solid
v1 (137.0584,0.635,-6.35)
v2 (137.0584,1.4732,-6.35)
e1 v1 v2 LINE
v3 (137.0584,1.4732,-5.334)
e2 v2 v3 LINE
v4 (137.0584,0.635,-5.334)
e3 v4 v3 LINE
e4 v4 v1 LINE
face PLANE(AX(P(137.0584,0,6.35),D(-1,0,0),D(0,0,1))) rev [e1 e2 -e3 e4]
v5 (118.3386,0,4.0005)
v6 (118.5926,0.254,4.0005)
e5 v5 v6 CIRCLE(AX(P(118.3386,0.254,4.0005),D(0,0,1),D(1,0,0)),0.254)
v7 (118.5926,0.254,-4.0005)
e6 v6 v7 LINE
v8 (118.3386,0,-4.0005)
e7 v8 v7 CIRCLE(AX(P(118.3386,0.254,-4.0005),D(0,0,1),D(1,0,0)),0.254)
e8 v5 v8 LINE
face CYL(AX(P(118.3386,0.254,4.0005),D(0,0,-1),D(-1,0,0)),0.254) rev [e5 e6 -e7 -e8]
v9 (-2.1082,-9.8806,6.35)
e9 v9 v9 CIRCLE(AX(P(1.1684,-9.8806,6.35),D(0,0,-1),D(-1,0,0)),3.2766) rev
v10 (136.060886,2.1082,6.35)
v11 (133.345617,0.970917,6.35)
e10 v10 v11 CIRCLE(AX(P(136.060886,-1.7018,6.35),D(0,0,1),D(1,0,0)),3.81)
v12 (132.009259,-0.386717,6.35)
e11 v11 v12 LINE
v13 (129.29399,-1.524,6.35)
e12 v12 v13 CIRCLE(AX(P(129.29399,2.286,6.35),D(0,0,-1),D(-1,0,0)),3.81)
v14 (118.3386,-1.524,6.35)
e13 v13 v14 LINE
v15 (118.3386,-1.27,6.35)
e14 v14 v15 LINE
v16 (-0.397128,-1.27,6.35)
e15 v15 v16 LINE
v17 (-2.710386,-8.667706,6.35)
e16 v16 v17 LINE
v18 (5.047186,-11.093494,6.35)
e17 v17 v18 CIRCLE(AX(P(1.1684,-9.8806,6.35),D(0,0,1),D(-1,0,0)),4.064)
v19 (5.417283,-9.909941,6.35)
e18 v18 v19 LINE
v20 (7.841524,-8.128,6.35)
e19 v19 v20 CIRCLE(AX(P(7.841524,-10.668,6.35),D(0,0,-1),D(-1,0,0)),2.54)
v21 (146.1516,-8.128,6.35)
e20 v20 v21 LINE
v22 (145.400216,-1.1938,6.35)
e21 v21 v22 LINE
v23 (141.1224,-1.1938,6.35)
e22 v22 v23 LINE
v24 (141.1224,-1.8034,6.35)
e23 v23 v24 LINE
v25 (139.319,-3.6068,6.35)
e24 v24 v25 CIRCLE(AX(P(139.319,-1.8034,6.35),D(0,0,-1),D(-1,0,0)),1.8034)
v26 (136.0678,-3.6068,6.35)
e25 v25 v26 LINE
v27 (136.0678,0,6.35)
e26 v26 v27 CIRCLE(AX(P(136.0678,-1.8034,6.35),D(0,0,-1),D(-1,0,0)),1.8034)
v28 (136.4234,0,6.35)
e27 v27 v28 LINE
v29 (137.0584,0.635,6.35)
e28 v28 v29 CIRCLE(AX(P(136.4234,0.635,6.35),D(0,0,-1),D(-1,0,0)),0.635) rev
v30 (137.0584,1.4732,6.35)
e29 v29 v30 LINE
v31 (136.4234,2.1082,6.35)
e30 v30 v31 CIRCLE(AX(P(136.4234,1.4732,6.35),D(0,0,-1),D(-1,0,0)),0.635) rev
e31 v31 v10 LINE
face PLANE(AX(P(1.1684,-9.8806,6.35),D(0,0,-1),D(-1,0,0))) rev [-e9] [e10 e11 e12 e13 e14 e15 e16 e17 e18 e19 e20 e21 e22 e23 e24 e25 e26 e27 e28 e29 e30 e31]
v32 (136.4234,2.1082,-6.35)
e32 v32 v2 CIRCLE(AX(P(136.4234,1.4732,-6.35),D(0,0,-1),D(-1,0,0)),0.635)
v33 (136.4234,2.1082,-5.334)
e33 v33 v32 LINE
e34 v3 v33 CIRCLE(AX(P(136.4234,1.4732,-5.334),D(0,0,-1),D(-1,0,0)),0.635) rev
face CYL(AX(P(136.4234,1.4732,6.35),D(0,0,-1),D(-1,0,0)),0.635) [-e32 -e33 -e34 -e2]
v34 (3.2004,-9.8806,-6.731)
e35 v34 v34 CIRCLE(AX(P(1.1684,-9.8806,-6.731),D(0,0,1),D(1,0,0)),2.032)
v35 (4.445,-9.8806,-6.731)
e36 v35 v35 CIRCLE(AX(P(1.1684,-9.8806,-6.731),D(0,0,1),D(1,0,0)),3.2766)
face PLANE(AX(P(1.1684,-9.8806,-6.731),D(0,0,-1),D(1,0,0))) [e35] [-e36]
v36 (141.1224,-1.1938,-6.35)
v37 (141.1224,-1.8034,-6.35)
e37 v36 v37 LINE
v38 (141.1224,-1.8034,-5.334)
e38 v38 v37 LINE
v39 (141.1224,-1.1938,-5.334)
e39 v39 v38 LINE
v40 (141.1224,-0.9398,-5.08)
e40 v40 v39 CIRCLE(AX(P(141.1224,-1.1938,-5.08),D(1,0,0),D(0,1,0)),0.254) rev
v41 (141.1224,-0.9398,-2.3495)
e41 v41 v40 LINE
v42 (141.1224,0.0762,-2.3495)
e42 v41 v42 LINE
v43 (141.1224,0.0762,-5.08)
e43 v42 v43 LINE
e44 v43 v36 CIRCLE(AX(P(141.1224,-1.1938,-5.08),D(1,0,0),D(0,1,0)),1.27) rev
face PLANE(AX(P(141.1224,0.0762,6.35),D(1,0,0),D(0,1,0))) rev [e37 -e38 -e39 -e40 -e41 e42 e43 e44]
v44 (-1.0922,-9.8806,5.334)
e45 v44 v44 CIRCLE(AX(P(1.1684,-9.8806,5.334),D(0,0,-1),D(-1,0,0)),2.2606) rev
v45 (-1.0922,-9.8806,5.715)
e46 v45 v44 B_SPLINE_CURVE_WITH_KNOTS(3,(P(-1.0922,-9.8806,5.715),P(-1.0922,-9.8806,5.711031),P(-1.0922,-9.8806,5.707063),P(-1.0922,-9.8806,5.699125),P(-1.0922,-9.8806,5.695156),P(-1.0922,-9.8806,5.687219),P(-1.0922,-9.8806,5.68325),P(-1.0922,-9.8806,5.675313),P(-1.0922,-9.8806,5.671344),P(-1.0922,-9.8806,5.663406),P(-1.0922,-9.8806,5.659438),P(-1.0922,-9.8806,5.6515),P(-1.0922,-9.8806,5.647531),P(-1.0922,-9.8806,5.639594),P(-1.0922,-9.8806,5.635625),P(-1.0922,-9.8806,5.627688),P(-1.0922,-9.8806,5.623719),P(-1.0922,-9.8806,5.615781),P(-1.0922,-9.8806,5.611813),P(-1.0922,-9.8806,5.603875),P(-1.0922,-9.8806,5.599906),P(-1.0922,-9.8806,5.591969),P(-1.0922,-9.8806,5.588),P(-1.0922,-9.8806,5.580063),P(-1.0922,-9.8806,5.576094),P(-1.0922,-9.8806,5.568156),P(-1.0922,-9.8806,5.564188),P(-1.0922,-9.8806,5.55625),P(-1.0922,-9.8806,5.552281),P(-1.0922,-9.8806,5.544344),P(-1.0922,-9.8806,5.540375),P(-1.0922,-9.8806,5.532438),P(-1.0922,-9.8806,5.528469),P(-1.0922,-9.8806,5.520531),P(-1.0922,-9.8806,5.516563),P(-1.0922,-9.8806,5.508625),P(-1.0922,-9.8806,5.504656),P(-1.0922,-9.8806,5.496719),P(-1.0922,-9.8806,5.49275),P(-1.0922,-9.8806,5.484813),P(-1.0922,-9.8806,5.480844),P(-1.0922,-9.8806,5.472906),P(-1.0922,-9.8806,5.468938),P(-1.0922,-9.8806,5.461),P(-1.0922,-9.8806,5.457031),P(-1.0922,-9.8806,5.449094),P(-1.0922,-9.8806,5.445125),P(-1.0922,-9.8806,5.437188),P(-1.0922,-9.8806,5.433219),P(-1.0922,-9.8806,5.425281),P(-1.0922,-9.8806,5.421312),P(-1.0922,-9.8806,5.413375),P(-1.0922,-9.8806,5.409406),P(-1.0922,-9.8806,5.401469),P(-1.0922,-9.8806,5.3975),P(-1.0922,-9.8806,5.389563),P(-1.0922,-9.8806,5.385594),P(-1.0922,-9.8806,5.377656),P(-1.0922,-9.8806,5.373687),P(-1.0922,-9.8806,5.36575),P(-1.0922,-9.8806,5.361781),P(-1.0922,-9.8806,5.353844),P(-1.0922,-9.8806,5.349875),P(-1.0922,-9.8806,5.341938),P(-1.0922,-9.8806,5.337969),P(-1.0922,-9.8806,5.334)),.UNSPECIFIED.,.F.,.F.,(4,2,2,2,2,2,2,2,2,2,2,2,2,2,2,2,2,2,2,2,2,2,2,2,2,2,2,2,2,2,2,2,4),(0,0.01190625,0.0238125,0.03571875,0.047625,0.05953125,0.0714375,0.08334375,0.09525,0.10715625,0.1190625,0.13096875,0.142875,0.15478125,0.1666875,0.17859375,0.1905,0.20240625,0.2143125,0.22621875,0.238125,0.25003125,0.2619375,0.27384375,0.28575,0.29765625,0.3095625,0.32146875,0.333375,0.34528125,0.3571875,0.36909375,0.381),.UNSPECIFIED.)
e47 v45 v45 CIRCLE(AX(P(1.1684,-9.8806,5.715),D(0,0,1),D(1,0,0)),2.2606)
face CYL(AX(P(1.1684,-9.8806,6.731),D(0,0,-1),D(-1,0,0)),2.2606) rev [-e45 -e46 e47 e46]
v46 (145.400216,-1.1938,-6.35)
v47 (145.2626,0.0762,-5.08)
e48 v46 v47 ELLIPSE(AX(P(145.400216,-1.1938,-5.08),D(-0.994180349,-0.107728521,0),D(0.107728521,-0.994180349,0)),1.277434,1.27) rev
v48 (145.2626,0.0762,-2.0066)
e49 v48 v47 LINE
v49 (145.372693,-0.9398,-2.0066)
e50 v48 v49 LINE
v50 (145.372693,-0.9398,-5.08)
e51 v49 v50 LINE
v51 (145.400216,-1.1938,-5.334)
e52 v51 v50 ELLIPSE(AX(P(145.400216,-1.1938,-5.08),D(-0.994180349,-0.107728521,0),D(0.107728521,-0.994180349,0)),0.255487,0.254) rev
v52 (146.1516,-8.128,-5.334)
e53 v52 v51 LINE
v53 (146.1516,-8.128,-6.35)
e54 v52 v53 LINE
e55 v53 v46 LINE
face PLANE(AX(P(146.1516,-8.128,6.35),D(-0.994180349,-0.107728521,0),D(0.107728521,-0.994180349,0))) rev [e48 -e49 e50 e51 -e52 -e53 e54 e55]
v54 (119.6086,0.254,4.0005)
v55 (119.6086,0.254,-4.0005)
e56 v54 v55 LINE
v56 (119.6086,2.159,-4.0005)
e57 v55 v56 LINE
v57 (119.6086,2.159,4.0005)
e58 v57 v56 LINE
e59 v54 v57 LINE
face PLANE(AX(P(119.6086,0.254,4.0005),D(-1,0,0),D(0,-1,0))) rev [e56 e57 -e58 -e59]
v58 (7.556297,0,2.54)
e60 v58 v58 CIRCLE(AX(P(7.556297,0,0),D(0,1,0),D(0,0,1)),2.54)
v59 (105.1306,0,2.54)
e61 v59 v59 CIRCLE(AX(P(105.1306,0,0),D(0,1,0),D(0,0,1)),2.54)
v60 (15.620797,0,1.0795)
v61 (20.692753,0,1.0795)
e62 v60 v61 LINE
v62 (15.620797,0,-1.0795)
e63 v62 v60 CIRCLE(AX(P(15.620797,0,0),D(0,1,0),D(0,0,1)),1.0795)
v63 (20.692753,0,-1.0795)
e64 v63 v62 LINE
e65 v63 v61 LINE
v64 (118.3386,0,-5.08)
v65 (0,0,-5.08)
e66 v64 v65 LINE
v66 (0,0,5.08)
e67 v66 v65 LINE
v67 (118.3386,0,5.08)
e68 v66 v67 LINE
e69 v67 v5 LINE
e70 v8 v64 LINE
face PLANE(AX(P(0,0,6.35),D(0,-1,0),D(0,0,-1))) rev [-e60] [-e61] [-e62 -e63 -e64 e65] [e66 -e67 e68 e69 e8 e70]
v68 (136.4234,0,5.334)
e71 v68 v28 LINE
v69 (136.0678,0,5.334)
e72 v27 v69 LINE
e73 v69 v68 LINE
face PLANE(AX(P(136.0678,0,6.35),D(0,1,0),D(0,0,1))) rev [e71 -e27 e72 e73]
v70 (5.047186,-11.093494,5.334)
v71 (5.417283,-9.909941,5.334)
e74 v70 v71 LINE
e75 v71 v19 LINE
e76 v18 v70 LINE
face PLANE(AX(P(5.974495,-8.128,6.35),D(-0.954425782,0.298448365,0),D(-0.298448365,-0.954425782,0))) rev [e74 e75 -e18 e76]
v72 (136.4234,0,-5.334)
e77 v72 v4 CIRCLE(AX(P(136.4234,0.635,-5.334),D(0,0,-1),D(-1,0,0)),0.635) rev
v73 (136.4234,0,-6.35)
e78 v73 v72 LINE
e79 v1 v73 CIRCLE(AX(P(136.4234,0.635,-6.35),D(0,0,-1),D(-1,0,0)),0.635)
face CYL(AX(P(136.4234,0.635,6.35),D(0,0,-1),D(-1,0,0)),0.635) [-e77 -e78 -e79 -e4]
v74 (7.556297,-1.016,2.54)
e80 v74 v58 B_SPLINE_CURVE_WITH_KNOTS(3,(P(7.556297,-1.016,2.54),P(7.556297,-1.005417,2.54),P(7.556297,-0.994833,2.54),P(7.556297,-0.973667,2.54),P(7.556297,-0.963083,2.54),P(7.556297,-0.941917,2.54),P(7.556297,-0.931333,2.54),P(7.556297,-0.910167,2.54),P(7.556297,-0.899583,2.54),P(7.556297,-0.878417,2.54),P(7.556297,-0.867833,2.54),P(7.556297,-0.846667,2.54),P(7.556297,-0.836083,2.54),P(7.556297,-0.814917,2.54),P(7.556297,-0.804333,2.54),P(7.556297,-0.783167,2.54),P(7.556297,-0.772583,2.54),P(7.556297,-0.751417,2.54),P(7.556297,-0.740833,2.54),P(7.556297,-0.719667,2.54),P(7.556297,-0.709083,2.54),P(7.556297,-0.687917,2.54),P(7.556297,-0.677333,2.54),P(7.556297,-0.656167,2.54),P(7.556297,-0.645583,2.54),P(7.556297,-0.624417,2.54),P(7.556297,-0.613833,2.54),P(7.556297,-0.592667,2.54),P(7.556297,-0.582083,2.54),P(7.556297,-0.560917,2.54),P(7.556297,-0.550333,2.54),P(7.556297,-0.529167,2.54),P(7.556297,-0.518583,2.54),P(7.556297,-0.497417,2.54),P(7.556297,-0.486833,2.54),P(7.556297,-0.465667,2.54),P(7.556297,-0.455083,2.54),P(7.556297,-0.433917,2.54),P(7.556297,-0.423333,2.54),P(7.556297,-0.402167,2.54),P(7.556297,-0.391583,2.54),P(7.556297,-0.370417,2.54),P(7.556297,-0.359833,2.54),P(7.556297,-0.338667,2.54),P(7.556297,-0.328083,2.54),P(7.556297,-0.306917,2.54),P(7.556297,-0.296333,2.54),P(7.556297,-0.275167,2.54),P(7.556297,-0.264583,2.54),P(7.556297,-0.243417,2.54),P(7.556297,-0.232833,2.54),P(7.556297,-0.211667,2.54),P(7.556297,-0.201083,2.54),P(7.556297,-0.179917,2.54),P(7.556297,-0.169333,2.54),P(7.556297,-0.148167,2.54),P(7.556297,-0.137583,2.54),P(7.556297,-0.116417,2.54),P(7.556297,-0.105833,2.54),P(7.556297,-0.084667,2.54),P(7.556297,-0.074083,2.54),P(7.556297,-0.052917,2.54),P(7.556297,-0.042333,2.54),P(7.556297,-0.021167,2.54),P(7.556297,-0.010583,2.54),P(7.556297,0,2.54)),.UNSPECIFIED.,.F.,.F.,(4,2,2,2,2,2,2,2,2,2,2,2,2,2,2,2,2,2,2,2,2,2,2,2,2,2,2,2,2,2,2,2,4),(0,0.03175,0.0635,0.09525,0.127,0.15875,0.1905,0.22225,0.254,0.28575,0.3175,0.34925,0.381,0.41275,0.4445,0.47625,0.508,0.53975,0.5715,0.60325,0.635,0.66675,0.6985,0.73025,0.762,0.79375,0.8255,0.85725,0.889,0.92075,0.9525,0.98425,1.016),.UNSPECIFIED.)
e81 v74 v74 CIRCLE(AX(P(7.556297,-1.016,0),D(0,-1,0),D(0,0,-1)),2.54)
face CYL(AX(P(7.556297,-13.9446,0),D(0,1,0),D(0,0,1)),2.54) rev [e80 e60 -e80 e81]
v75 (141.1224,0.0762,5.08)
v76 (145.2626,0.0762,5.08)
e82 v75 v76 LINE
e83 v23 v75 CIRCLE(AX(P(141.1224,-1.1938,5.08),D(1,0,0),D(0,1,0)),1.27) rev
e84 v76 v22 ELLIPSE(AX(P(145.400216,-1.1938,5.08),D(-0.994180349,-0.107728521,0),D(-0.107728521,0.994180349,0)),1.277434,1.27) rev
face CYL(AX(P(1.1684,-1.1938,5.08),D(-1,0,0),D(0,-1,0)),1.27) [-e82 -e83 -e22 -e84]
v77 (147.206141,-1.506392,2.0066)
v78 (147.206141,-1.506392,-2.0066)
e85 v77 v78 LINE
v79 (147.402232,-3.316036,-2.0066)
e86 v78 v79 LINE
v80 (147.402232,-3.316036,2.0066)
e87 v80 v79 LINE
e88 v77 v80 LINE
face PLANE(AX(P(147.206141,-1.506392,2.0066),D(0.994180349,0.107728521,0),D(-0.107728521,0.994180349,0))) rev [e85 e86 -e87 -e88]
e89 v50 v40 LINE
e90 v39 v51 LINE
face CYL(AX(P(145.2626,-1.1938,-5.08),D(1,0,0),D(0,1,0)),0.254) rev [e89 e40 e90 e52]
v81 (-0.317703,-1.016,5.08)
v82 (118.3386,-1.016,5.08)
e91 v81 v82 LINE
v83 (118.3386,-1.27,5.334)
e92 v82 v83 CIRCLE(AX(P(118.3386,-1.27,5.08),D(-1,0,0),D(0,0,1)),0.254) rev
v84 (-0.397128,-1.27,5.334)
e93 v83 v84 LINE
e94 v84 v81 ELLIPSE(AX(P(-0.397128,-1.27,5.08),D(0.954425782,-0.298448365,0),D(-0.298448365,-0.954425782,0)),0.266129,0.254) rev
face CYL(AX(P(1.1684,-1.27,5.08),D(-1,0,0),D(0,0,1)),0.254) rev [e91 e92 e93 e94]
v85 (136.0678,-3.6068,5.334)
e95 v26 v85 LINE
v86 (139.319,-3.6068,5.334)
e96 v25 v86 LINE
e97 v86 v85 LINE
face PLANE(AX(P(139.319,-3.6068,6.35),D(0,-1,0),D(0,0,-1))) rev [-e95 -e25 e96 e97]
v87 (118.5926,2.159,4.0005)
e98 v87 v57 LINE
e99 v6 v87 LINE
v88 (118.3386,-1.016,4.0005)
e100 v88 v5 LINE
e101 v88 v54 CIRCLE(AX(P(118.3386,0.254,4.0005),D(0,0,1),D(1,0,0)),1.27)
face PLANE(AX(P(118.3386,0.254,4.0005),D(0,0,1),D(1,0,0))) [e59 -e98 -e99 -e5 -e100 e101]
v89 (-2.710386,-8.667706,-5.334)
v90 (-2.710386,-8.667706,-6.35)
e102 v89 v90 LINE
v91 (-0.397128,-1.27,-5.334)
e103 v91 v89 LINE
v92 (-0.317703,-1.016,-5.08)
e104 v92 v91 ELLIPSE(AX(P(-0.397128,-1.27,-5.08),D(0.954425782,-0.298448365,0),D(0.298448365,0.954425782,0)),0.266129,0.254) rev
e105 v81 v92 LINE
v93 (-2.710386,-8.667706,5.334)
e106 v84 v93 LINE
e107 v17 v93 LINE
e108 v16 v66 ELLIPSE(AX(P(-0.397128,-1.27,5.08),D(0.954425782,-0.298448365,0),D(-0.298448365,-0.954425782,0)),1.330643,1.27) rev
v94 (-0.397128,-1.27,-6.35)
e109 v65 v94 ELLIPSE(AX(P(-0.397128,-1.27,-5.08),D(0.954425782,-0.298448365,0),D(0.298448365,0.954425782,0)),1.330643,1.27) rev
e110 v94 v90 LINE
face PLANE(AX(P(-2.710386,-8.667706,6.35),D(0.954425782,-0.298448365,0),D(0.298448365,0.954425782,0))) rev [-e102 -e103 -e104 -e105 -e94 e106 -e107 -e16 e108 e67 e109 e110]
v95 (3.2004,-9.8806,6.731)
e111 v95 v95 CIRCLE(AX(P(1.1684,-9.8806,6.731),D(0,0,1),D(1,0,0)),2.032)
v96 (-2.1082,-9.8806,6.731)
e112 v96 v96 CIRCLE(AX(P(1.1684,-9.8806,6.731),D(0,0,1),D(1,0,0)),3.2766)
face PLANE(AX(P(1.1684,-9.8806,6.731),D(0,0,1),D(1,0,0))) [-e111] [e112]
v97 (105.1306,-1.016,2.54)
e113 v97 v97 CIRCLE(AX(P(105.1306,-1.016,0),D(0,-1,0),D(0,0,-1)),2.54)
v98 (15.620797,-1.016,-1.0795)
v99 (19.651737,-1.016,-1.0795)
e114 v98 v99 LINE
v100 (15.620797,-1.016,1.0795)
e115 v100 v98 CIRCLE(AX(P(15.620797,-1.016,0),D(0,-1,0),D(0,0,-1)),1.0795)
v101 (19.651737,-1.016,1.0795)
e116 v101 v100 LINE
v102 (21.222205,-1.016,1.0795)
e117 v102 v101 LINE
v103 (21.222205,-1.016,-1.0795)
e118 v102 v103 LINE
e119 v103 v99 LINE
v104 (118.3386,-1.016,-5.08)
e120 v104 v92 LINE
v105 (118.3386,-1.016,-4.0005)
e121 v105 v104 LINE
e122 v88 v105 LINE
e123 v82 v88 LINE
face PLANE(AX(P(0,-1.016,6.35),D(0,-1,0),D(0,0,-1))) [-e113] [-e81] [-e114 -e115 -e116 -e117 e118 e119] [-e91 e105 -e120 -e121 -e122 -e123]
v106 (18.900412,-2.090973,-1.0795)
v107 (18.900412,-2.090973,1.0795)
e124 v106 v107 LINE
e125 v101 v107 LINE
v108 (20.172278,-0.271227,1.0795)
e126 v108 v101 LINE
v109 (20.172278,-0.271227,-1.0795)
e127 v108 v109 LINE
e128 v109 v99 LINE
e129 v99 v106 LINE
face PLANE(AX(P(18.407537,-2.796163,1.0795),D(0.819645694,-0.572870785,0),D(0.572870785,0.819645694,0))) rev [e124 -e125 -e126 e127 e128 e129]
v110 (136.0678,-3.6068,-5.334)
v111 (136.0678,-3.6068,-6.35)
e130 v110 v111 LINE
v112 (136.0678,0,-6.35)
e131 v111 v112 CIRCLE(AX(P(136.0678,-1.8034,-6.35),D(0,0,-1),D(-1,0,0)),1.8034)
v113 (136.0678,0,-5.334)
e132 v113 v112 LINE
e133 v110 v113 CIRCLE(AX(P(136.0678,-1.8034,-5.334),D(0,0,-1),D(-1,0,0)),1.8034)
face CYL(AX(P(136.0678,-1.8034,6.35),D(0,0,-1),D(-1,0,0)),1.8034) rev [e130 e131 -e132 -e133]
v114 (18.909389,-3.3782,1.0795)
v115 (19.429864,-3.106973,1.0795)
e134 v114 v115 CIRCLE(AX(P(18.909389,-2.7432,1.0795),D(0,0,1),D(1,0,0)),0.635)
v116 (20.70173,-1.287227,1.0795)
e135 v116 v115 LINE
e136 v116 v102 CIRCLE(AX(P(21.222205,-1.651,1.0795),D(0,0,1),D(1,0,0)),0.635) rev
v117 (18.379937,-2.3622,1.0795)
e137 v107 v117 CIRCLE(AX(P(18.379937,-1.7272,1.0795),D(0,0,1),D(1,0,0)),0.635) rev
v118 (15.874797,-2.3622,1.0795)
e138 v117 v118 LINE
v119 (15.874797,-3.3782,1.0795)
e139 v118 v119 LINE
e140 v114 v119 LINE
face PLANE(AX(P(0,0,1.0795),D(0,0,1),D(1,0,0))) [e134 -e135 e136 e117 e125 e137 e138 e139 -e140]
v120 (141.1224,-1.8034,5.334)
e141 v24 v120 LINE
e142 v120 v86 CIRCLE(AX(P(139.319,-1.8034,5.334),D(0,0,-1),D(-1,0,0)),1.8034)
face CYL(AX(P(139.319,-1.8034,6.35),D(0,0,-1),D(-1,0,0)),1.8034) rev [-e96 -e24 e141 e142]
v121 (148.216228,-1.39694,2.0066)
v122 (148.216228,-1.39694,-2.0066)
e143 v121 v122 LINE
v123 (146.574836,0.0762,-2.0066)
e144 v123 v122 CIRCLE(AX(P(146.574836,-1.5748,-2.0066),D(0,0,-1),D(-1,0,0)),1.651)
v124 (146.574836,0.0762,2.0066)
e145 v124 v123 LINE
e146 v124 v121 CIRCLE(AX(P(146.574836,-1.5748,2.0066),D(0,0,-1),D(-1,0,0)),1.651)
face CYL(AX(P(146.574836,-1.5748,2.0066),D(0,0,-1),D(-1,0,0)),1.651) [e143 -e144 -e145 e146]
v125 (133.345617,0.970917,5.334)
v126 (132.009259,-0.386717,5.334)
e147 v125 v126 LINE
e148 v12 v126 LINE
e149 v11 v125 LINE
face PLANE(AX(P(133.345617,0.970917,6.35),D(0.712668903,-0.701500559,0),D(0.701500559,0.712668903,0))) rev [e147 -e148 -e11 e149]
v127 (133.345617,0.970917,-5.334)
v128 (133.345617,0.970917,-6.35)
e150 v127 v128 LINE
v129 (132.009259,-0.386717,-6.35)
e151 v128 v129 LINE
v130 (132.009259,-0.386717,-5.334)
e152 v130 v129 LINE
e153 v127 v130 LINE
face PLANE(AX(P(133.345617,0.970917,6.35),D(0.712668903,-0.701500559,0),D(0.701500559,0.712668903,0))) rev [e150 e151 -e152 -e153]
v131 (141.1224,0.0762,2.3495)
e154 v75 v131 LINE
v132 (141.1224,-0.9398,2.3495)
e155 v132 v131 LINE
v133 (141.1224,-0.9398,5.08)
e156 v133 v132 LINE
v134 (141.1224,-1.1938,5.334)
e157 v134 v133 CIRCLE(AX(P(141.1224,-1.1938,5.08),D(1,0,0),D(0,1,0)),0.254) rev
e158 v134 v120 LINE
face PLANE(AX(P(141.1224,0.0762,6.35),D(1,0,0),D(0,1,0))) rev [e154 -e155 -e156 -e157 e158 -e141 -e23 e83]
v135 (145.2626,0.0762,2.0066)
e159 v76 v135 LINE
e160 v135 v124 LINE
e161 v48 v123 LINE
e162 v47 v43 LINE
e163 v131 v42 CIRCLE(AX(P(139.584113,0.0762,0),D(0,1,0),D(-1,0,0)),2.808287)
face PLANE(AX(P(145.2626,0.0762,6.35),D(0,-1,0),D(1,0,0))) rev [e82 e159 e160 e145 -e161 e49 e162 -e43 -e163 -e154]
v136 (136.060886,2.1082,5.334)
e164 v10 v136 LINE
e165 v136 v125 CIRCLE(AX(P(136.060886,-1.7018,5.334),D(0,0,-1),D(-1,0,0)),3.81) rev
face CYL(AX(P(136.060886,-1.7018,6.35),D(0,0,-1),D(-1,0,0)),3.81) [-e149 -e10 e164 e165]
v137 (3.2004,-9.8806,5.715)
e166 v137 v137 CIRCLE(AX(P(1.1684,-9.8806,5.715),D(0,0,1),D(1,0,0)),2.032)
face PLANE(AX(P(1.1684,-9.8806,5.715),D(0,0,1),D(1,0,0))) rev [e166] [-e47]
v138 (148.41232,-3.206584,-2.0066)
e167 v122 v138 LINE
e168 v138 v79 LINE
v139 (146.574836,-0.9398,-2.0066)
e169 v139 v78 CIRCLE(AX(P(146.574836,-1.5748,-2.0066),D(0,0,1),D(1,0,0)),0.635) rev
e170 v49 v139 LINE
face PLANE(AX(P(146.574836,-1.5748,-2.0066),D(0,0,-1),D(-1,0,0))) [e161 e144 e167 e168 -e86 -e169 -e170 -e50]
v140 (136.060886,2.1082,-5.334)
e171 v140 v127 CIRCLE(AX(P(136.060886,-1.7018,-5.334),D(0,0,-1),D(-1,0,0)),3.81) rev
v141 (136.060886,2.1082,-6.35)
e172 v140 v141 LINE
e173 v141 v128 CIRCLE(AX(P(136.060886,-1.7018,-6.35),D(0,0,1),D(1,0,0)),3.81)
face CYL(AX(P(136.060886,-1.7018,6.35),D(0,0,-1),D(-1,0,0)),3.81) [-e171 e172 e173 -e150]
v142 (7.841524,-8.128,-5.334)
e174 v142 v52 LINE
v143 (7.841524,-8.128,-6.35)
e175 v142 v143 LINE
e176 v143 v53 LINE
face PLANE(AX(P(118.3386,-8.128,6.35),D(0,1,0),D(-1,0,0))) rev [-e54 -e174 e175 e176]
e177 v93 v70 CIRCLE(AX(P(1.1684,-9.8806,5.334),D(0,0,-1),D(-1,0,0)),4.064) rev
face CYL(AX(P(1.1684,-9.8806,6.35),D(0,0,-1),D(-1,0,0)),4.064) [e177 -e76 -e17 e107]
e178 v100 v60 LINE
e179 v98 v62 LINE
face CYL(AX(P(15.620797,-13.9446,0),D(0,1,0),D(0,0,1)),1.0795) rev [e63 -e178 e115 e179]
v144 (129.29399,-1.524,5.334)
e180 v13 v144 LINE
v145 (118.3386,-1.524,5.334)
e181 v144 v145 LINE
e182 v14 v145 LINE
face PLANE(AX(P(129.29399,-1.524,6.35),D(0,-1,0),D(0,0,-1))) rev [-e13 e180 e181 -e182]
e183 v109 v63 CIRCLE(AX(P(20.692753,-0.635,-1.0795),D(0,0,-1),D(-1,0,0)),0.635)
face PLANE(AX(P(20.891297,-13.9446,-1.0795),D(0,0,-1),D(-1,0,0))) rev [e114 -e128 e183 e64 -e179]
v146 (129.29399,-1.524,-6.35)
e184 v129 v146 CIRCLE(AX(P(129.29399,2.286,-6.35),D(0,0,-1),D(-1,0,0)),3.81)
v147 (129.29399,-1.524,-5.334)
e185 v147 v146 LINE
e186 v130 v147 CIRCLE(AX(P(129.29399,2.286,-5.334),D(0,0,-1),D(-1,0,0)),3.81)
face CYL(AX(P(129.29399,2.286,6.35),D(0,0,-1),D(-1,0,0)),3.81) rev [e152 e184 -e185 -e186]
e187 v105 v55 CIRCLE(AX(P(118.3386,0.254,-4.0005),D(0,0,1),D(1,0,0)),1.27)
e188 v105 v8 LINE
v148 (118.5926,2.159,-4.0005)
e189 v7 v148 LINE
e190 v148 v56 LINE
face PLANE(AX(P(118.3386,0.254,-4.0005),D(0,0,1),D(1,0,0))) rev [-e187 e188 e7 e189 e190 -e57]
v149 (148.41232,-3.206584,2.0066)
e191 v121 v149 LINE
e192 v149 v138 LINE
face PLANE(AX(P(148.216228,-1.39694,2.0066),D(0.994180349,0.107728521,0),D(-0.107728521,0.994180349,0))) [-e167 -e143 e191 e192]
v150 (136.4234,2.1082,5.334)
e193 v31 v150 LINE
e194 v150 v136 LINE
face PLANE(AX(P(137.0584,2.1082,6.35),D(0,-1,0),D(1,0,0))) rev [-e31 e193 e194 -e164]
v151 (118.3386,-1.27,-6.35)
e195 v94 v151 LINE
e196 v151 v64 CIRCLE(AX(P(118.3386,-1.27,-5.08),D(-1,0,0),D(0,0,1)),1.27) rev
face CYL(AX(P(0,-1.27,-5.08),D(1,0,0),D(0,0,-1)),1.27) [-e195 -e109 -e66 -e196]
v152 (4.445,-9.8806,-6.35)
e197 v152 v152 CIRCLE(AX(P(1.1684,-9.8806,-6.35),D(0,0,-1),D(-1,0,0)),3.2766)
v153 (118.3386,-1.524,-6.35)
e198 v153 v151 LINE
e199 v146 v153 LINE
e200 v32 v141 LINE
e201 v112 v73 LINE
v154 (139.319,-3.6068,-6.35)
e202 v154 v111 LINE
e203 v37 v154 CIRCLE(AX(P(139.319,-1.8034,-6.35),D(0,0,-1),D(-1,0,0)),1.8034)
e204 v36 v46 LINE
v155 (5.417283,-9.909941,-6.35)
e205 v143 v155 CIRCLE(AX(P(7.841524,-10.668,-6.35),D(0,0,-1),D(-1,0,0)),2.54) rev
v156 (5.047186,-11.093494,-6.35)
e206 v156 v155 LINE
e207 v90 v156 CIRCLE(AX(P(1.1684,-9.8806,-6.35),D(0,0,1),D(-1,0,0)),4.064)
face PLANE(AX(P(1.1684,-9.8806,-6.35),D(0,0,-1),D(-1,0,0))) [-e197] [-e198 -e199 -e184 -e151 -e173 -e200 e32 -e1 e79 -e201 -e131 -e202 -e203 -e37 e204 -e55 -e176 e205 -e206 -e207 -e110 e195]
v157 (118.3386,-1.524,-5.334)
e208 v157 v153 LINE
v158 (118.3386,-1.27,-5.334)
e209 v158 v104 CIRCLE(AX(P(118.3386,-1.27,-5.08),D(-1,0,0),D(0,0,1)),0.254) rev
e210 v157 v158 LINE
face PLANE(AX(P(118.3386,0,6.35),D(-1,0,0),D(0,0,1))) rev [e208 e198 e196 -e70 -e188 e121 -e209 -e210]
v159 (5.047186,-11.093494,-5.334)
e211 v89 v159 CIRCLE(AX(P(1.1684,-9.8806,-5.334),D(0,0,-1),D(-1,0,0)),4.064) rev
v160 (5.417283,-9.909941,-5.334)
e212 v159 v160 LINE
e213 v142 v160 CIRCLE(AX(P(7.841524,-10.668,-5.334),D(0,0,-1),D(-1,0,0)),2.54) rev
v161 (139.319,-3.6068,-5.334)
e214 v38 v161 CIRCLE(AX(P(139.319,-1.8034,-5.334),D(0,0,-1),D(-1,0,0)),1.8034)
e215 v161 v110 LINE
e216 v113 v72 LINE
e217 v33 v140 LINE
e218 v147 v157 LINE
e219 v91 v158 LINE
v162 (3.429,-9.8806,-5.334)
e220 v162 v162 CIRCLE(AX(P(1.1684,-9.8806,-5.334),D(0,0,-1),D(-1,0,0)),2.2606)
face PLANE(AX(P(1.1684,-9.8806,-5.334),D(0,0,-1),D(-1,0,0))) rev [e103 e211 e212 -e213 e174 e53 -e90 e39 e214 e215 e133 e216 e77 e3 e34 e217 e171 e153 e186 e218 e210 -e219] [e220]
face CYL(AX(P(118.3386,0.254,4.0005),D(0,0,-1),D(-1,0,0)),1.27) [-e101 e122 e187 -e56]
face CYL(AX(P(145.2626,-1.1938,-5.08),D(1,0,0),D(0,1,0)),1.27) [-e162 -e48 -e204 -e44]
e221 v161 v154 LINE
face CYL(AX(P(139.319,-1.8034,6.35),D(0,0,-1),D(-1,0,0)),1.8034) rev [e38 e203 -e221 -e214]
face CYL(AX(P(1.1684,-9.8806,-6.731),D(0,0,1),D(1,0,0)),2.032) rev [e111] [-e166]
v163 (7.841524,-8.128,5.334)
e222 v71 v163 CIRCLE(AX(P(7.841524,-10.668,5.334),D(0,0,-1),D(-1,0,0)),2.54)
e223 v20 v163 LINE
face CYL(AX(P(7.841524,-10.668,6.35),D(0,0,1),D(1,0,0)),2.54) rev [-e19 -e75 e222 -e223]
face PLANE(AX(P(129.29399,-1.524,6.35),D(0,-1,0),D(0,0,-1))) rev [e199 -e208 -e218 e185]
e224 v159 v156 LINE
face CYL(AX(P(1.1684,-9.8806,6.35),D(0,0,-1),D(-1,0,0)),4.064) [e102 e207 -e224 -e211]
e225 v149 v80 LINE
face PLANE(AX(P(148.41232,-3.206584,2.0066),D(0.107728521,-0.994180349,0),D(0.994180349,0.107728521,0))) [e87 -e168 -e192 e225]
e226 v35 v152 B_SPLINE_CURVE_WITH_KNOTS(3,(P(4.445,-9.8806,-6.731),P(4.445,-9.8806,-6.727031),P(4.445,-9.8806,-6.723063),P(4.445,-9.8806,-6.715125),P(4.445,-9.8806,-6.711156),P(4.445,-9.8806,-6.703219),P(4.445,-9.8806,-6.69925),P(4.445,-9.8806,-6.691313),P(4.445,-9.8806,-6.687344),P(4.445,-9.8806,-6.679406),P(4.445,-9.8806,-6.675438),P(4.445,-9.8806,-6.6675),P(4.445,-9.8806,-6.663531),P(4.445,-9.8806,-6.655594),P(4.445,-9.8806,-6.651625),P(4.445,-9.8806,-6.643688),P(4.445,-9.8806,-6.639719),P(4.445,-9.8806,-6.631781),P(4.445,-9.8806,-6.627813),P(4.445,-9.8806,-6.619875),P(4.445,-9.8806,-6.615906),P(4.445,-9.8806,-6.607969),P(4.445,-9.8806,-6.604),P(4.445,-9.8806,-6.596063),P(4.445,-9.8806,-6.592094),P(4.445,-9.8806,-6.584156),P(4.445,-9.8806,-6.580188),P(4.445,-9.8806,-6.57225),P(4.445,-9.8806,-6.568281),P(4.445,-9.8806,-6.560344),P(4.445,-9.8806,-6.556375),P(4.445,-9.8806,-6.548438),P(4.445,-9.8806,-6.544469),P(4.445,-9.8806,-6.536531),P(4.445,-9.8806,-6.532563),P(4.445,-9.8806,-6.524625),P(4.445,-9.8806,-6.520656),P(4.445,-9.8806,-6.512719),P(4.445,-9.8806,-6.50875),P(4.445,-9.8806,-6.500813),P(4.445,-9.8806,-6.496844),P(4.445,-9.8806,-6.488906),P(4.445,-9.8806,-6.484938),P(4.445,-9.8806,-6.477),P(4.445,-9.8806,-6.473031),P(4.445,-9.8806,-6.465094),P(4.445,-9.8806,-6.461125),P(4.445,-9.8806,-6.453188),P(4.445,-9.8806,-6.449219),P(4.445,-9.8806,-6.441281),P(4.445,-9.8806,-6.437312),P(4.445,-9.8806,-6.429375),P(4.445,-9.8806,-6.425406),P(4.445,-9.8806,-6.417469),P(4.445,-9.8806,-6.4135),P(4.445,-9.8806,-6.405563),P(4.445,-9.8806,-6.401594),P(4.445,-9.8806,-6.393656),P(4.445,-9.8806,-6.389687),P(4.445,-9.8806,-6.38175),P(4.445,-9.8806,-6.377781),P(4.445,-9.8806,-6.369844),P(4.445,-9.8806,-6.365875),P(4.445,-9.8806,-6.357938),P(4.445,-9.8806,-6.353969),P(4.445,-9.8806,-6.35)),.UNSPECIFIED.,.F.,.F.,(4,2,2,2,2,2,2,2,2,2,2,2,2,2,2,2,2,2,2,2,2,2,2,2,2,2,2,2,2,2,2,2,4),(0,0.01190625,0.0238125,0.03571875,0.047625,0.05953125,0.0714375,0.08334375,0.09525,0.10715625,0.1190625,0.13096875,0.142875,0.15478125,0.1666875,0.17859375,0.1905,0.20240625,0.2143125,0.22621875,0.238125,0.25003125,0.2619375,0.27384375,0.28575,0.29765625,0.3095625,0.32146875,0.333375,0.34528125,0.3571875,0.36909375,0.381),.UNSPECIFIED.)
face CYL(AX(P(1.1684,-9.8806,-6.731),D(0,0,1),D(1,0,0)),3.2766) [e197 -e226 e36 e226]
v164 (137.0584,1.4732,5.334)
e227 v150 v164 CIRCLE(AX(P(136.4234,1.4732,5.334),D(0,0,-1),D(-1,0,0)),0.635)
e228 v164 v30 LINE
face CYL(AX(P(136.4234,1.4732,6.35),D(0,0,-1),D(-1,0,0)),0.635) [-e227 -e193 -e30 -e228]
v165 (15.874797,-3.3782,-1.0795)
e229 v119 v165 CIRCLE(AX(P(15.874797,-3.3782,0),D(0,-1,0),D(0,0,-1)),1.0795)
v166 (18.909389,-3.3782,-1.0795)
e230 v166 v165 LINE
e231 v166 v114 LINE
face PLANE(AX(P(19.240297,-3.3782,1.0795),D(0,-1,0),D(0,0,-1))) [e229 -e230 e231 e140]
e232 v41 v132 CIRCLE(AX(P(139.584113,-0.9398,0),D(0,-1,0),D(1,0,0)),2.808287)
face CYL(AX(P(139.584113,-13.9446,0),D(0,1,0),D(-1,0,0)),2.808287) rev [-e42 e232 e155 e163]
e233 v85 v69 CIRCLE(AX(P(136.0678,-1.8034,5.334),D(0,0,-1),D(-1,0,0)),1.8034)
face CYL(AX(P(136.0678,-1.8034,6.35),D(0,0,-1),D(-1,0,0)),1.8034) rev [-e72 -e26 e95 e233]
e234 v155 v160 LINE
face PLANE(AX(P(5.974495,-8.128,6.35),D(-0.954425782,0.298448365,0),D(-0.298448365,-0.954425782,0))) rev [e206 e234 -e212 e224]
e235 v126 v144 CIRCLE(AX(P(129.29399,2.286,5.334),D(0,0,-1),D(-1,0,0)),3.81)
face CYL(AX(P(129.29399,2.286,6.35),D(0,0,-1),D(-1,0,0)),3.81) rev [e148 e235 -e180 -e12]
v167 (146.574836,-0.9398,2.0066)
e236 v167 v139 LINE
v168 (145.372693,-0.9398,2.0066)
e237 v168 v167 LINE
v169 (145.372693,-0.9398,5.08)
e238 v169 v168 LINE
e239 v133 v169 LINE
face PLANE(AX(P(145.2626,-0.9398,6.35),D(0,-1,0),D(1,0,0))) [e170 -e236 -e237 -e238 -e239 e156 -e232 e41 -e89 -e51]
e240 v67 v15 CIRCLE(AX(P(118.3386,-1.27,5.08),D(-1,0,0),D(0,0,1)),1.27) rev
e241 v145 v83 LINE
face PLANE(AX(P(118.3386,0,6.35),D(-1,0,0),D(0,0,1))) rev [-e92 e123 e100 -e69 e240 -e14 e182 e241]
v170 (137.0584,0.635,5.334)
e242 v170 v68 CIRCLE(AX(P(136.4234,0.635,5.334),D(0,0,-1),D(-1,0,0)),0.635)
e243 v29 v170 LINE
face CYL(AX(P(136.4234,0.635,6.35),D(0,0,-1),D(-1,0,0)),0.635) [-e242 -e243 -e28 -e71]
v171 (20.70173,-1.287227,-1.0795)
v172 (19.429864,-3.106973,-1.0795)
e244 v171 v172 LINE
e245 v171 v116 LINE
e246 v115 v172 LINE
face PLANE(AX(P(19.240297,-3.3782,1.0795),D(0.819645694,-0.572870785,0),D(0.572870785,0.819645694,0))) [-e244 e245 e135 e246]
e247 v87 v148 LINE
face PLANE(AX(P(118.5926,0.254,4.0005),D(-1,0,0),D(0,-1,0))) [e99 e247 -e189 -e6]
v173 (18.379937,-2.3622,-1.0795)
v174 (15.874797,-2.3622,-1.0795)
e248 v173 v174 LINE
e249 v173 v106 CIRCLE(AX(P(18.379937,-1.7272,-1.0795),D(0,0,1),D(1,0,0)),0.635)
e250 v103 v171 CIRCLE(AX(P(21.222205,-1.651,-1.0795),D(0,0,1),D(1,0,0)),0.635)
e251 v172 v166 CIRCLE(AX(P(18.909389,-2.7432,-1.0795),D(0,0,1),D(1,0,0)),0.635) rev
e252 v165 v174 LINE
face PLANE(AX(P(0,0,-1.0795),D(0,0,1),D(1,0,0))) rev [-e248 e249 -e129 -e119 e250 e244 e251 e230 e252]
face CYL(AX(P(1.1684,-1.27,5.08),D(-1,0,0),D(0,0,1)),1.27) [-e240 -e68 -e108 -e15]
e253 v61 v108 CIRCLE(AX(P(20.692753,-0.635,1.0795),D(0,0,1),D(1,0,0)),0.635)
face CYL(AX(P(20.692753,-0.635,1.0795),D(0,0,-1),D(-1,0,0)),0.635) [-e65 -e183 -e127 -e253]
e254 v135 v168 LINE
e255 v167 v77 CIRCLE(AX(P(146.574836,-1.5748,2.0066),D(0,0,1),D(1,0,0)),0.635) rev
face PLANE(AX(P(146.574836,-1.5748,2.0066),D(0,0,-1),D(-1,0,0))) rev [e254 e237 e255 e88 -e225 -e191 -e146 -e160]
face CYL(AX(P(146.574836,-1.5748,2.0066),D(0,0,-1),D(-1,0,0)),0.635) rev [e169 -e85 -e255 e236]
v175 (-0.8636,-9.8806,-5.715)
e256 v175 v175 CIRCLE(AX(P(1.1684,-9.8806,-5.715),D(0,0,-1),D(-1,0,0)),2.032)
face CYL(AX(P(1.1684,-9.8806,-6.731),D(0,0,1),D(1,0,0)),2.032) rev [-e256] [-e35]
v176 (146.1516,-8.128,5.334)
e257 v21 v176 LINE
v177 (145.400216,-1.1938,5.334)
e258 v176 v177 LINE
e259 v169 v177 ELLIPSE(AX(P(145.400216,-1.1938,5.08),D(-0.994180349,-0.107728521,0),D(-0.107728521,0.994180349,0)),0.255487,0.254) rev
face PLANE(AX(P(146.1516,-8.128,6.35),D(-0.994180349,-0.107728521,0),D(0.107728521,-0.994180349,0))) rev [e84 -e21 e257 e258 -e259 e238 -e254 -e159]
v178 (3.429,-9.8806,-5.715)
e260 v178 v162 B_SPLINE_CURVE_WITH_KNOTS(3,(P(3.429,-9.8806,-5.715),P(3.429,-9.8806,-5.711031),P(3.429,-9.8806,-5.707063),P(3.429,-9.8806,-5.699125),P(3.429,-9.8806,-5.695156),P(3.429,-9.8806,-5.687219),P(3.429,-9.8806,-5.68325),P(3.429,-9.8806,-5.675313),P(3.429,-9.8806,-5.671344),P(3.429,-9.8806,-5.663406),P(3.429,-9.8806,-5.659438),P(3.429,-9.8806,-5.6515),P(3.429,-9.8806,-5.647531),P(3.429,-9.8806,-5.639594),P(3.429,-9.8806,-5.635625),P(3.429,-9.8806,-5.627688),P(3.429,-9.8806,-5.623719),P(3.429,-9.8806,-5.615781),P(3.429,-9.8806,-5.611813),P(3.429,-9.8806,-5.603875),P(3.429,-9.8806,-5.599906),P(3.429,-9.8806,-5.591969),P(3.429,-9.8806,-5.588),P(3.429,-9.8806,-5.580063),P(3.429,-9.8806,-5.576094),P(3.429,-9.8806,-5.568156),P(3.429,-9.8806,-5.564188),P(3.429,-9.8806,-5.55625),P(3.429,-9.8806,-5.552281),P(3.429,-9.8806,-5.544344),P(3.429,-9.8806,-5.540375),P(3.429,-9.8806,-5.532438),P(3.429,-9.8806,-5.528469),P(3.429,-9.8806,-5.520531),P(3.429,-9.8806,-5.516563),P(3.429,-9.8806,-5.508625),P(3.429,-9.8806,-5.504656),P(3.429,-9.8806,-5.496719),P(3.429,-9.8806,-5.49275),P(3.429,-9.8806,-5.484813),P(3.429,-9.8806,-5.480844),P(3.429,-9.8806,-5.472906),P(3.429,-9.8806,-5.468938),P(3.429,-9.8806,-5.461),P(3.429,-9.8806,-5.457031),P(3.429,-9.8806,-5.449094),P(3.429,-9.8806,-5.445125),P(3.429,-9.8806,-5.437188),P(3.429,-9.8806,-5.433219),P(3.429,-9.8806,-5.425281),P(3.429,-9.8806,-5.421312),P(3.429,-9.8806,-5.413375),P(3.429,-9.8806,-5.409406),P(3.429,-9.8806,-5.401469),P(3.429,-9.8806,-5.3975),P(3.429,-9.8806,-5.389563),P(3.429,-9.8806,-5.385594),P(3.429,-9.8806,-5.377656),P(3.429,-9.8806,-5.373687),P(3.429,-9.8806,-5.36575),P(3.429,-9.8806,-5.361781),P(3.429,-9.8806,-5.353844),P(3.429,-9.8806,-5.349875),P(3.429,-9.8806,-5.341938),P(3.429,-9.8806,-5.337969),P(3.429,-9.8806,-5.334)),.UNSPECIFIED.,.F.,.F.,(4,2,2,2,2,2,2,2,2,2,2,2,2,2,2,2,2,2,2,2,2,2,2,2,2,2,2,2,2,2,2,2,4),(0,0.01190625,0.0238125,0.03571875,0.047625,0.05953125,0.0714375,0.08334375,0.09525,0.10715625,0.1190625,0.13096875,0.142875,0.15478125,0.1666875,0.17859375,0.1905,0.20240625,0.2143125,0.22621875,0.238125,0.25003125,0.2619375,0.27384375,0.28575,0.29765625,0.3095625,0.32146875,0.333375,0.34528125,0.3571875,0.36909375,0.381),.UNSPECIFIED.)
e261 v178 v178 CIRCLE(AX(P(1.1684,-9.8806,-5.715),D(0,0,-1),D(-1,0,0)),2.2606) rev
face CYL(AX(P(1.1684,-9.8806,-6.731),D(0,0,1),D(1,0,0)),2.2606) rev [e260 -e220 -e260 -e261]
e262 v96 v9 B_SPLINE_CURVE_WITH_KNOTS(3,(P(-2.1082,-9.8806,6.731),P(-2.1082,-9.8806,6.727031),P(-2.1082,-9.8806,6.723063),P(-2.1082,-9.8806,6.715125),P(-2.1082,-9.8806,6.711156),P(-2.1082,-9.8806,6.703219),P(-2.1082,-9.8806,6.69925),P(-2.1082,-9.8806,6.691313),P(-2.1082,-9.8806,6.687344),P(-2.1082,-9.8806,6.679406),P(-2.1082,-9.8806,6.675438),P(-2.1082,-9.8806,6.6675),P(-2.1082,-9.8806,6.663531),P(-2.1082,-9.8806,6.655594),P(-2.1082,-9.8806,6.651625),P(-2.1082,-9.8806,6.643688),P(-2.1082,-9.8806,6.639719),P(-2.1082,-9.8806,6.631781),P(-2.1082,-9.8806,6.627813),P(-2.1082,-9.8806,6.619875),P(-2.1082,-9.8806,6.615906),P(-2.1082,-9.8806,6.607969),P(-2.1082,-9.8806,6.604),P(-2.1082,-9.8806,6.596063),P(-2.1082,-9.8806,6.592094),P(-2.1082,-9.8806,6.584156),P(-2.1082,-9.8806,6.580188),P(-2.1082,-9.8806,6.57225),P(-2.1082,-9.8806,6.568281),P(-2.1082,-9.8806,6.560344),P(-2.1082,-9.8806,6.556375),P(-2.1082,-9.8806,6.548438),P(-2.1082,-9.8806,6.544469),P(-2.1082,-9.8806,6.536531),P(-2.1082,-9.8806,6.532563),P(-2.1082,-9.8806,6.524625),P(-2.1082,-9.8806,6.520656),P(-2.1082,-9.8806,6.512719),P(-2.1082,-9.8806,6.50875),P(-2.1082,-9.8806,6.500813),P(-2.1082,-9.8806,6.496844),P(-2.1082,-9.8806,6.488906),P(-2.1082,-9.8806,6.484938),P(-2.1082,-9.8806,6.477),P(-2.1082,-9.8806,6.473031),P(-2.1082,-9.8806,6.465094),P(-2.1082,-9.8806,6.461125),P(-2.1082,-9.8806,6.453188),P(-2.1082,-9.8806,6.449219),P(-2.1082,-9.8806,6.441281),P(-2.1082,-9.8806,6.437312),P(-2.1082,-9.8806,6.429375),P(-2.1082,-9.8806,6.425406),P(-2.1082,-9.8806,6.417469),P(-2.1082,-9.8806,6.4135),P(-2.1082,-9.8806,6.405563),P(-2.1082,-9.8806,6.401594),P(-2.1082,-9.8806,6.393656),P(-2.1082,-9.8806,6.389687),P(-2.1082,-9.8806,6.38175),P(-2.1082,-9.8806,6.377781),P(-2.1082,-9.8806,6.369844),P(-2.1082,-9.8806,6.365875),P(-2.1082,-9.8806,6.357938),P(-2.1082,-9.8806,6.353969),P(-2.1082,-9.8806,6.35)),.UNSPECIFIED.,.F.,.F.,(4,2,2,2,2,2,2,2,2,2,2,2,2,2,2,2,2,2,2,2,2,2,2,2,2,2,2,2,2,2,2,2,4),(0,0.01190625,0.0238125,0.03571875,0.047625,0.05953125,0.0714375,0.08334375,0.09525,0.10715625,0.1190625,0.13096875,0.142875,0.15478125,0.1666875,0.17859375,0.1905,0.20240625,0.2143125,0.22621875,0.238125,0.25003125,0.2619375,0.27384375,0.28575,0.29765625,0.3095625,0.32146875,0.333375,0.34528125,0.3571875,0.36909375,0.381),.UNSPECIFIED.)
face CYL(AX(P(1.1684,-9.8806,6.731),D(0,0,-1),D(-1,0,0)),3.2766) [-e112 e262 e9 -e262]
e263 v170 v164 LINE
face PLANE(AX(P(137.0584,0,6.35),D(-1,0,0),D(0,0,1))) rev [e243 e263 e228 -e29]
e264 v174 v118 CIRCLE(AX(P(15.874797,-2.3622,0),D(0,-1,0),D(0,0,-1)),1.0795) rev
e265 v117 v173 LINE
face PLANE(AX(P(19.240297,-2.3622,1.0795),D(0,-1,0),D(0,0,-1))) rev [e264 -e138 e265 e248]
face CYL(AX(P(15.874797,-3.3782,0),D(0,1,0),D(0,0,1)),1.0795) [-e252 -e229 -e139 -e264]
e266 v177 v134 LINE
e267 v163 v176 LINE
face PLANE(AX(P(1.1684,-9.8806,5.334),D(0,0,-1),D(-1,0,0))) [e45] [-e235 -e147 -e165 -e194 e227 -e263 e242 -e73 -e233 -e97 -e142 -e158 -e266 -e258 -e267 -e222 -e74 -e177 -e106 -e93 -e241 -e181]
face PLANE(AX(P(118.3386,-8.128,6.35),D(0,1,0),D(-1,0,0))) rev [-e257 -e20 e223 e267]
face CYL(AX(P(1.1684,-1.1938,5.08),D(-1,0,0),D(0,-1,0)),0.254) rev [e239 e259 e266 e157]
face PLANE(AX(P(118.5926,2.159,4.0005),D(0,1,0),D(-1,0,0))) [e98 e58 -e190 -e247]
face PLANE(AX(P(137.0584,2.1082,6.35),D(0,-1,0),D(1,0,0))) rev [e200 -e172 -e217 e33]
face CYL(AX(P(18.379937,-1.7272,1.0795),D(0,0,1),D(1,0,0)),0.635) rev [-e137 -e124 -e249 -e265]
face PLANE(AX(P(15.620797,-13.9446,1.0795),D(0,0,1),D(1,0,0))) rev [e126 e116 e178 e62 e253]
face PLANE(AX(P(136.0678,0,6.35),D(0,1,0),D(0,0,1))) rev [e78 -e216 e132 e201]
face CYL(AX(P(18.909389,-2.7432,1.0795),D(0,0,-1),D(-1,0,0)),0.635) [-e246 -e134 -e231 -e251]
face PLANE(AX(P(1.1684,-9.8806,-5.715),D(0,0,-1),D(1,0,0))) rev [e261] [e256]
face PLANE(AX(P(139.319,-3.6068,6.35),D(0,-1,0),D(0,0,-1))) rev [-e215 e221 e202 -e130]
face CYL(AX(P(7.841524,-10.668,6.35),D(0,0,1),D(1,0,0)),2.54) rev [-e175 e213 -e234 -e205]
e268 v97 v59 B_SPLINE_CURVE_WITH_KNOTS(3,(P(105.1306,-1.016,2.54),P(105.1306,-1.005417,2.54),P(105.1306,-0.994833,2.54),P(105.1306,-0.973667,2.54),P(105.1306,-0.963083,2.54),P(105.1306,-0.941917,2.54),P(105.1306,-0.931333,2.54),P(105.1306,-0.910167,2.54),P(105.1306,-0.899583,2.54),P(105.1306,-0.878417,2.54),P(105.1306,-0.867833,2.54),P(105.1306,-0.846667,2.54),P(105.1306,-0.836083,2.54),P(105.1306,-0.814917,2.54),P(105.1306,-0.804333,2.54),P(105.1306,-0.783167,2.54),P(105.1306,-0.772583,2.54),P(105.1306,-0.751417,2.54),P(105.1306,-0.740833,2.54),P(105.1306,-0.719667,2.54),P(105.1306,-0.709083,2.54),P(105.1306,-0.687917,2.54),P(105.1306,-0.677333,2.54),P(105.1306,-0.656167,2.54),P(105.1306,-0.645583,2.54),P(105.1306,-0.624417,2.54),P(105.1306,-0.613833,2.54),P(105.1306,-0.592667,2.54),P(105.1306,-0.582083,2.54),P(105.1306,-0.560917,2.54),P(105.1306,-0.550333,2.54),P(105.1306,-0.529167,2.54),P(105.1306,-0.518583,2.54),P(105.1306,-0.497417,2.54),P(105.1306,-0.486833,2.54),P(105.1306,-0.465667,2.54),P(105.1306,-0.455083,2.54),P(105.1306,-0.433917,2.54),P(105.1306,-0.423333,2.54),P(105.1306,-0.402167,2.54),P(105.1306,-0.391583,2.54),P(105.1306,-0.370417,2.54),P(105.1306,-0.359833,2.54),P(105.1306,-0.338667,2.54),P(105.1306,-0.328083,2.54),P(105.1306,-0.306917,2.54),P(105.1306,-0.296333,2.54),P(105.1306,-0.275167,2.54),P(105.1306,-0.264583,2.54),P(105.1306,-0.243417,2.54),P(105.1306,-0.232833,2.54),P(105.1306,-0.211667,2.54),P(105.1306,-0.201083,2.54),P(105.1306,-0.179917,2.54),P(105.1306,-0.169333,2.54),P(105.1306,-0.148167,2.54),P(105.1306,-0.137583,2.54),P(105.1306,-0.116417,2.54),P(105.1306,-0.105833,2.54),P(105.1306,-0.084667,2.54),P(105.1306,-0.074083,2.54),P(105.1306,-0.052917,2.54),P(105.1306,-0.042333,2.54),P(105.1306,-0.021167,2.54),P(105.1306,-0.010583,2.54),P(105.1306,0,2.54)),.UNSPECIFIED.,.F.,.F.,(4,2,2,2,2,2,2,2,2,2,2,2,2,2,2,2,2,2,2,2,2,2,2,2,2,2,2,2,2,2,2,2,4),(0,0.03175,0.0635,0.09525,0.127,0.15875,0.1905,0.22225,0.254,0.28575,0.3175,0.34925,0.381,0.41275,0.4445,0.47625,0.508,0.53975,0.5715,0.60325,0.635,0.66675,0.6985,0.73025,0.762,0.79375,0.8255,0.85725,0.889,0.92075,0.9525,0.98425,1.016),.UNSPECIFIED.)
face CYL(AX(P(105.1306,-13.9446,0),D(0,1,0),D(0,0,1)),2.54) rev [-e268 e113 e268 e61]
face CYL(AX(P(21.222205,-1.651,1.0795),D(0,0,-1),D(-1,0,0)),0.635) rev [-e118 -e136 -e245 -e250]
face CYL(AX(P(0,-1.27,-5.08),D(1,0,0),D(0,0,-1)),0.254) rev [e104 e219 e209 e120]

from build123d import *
from OCP.BRepFilletAPI import BRepFilletAPI_MakeFillet

# Parameters (mm, degrees)
BOSS_EXTRUDE1_DEPTH = 6.35
SKETCH2_R           = 3.2766
BOSS_EXTRUDE2_DEPTH = 0.381
FILLET1_R1          = 1.27
FILLET1_R2          = 2.54
SHELL1_T            = -1.016
BOSS_EXTRUDE3_DEPTH = 6.35
FILLET2_R           = 1.27
SHELL2_START        = 118.3386
SHELL2_DEPTH        = 27.813
SHELL2_START_2      = 129.293990182
SHELL2_2_DEPTH      = 7.764409818
FILLET3_R           = 0.635
SKETCH4_R           = 2.032
CUT_EXTRUDE1_DEPTH  = 148.431229717
EXTRUDE_THIN1_DEPTH = 2.0066
CUT_EXTRUDE2_DEPTH  = 150.225017324
EXTRUDE_THIN2_DEPTH = 4.0005
SKETCH8_R           = 2.54
CUT_EXTRUDE3_DEPTH  = 150.217877052
EXTRUDE_THIN3_DEPTH = 1.0795
FILLET4_R           = 0.635
FILLET6_RADIUS      = 1.0795
FILLET6_LENGTH      = 1.016


# Read off the part's stored shape, not the designer's step: Shell2
with BuildPart() as part:
    # Sketch1 → Boss-Extrude1 (new, symmetric)
    with BuildSketch(Plane.XY):
        with BuildLine():
            Line((0, 0), (118.3386, 0))
            Line((118.3386, 0), (118.3386, -8.128))
            Line((118.3386, -8.128), (5.974494608, -8.128))
            Line((5.974494608, -8.128), (5.047186378, -11.093494156))
            ThreePointArc((5.047186378, -11.093494156), (-0.044494156, -13.759386378), (-2.710386378, -8.667705844))
            Line((-2.710386378, -8.667705844), (0, 0))
        make_face()
    extrude(amount=BOSS_EXTRUDE1_DEPTH, both=True)

    # Sketch2 → Boss-Extrude2 (add)
    with BuildSketch(Plane.XY.offset(6.35)):
        with Locations(Location((1.1684, -9.8806, 0), (0, 0, 180))):
            Circle(SKETCH2_R)
    boss_extrude2 = extrude(amount=BOSS_EXTRUDE2_DEPTH)

    # Mirror1: Boss-Extrude2 across plane
    add(boss_extrude2.mirror(Plane.XY))

    # Fillet1: one fillet with a radius per group of edges: ONE call of the kernel's fillet builder (fillet() takes one radius for all edges)
    fillet1_edges_1 = [part.edges().sort_by_distance(p)[0] for p in [
        (59.1693, 0, 6.35),
        (59.1693, 0, -6.35),
    ]]
    fillet1_edges_2 = [part.edges().sort_by_distance(p)[0] for p in [
        (5.974494608, -8.128, 0),
    ]]
    fillet1 = BRepFilletAPI_MakeFillet(part.part.solid().wrapped)
    for e in fillet1_edges_1:
        fillet1.Add(FILLET1_R1, e.wrapped)
    for e in fillet1_edges_2:
        fillet1.Add(FILLET1_R2, e.wrapped)
    add(Compound.cast(fillet1.Shape()), mode=Mode.REPLACE)

    # Shell1
    shell1_openings = [part.faces().sort_by_distance(p)[0] for p in [
        (118.3386, -4.089523172, 0),
        (63.090062087, -8.128, 0),
        (5.232234532, -10.501717654, 0),
        (-0.044494156, -13.759386378, 0),
        (-1.363208192, -4.359484576, 0),
        (6.337175389, -8.621408996, 0),
    ]]
    offset(amount=SHELL1_T, openings=shell1_openings, kind=Kind.INTERSECTION)

    # Sketch3 → Boss-Extrude3 (add, symmetric)
    with BuildSketch(Plane.XY):
        with BuildLine():
            Line((118.3386, -8.128), (146.1516, -8.128))
            Line((146.1516, -8.128), (145.2626, 0.0762))
            Line((145.2626, 0.0762), (141.1224, 0.0762))
            Line((141.1224, 0.0762), (141.1224, -1.8034))
            ThreePointArc((141.1224, -1.8034), (140.594196369, -3.078596369), (139.319, -3.6068))
            Line((139.319, -3.6068), (136.0678, -3.6068))
            ThreePointArc((136.0678, -3.6068), (134.2644, -1.8034), (136.0678, 0))
            Line((136.0678, 0), (137.0584, 0))
            Line((137.0584, 0), (137.0584, 2.1082))
            Line((137.0584, 2.1082), (136.060885789, 2.1082))
            ThreePointArc((136.060885789, 2.1082), (134.588974152, 1.812396371), (133.345617268, 0.97091713))
            Line((133.345617268, 0.97091713), (132.009258703, -0.38671713))
            ThreePointArc((132.009258703, -0.38671713), (130.765901819, -1.228196371), (129.293990182, -1.524))
            Line((129.293990182, -1.524), (118.3386, -1.524))
            Line((118.3386, -1.524), (118.3386, -8.128))
        make_face()
    extrude(amount=BOSS_EXTRUDE3_DEPTH, both=True)

    # Fillet2
    fillet2_edges = [part.edges().sort_by_distance(p)[0] for p in [
        (143.1925, 0.0762, -6.35),
        (143.1925, 0.0762, 6.35),
    ]]
    fillet(fillet2_edges, radius=FILLET2_R)

    # Shell2 outline → Shell2 (cut)
    with BuildSketch(Plane.YZ.offset(SHELL2_START)):
        with BuildLine():
            Line((-8.128, 5.334), (-8.128, -5.334))
            Line((-8.128, -5.334), (-1.1938, -5.334))
            ThreePointArc((-1.1938, -5.334), (-1.014194878, -5.259605122), (-0.9398, -5.08))
            Line((-0.9398, -5.08), (-0.9398, 5.08))
            ThreePointArc((-0.9398, 5.08), (-1.014194878, 5.259605122), (-1.1938, 5.334))
            Line((-1.1938, 5.334), (-8.128, 5.334))
        make_face()
    extrude(amount=SHELL2_DEPTH, mode=Mode.SUBTRACT)

    # Shell2 2 outline → Shell2 2 (cut)
    with BuildSketch(Plane.YZ.offset(SHELL2_START_2)):
        with BuildLine():
            ThreePointArc((-1.1938, 5.334), (-1.014194878, 5.259605122), (-0.9398, 5.08))
            Line((-0.9398, 5.08), (-0.9398, -5.08))
            ThreePointArc((-0.9398, -5.08), (-1.014194878, -5.259605122), (-1.1938, -5.334))
            Line((-1.1938, -5.334), (2.1082, -5.334))
            Line((2.1082, -5.334), (2.1082, 5.334))
            Line((2.1082, 5.334), (-1.1938, 5.334))
        make_face()
    extrude(amount=SHELL2_2_DEPTH, mode=Mode.SUBTRACT)

    # Fillet3
    fillet3_edges = [part.edges().sort_by_distance(p)[0] for p in [
        (137.0584, 2.1082, -5.842),
        (137.0584, 0, -5.842),
        (137.0584, 0, 5.842),
        (137.0584, 2.1082, 5.842),
    ]]
    fillet(fillet3_edges, radius=FILLET3_R)

    # Sketch4 → Cut-Extrude1 (cut, through all)
    with BuildSketch(Plane.XY.offset(6.731)):
        with Locations((1.1684, -9.8806)):
            Circle(SKETCH4_R)
    extrude(amount=-CUT_EXTRUDE1_DEPTH, mode=Mode.SUBTRACT)

    # Sketch5 → Extrude-Thin1 (add, symmetric)
    with BuildSketch(Plane.XY):
        with BuildLine():
            Line((145.2626, 0.0762), (146.574836441, 0.0762))
            ThreePointArc((146.574836441, 0.0762), (147.677595365, -0.346091835), (148.216228196, -1.396940212))
            Line((148.216228196, -1.396940212), (148.412319576, -3.206583512))
            Line((148.412319576, -3.206583512), (147.402232341, -3.316035689))
            Line((147.402232341, -3.316035689), (147.206140962, -1.506392389))
            ThreePointArc((147.206140962, -1.506392389), (146.998974488, -1.102219937), (146.574836441, -0.9398))
            Line((146.574836441, -0.9398), (145.2626, -0.9398))
            Line((145.2626, -0.9398), (145.2626, 0.0762))
        make_face()
    extrude(amount=EXTRUDE_THIN1_DEPTH, both=True)

    # Sketch6 → Cut-Extrude2 (cut, through all)
    with BuildSketch(Plane(origin=(0, 0.0762, 0), x_dir=(1, 0, 0), z_dir=(0, 1, 0))):
        with BuildLine():
            Line((141.1224, 2.3495), (141.1224, -2.3495))
            ThreePointArc((141.1224, -2.3495), (142.3924, 0), (141.1224, 2.3495))
        make_face()
    extrude(amount=-CUT_EXTRUDE2_DEPTH, mode=Mode.SUBTRACT)

    # Sketch7 → Extrude-Thin2 (add, symmetric)
    with BuildSketch(Plane.XY):
        with BuildLine():
            ThreePointArc((118.3386, -1.016), (119.236625612, -0.644025612), (119.6086, 0.254))
            Line((119.6086, 0.254), (119.6086, 2.159))
            Line((119.6086, 2.159), (118.5926, 2.159))
            Line((118.5926, 2.159), (118.5926, 0.254))
            ThreePointArc((118.5926, 0.254), (118.518205122, 0.074394878), (118.3386, 0))
            Line((118.3386, 0), (118.3386, -1.016))
        make_face()
    extrude(amount=EXTRUDE_THIN2_DEPTH, both=True)

    # Sketch8 → Cut-Extrude3 (cut, through all)
    with BuildSketch(Plane(origin=(0, 0, 0), x_dir=(1, 0, 0), z_dir=(0, 1, 0))):
        with Locations(Location((7.556297414, 0, 0), (0, 0, 270))):
            Circle(SKETCH8_R)
        with Locations(Location((105.1306, 0, 0), (0, 0, 270))):
            Circle(SKETCH8_R)
        with BuildLine():
            Line((20.891297414, -1.0795), (20.891297414, 1.0795))
            Line((20.891297414, 1.0795), (15.620797414, 1.0795))
            ThreePointArc((15.620797414, 1.0795), (14.541297414, 0), (15.620797414, -1.0795))
            Line((15.620797414, -1.0795), (20.891297414, -1.0795))
        make_face()
    extrude(amount=-CUT_EXTRUDE3_DEPTH, mode=Mode.SUBTRACT)

    # Sketch9 → Extrude-Thin3 (add, symmetric)
    with BuildSketch(Plane.XY):
        Polygon((21.907297414, -1.016), (20.891297414, -1.016), (19.240297016, -3.3782), (14.795297016, -3.3782), (14.795297016, -2.3622), (18.710844734, -2.3622), (20.361845133, 0), (21.907297414, 0), align=None)
    extrude(amount=EXTRUDE_THIN3_DEPTH, both=True)

    # Fillet4
    fillet4_edges = [part.edges().sort_by_distance(p)[0] for p in [
        (20.891297414, -1.016, 0),
        (18.710844734, -2.3622, 0),
        (19.240297016, -3.3782, 0),
        (20.361845133, 0, 0),
    ]]
    fillet(fillet4_edges, radius=FILLET4_R)

    # Fillet6: full round fillet: the end face becomes a half cylinder, R = half its width
    fillet6_face = Plane((14.795297016, -2.8702, 0), x_dir=(0, -1, 0), z_dir=(-1, 0, 0))  # on the end face: x along it, z out of the body
    fillet6_slab = fillet6_face.offset(-FILLET6_RADIUS / 2) * Box(FILLET6_LENGTH, 2 * FILLET6_RADIUS, FILLET6_RADIUS, mode=Mode.PRIVATE)  # the body's end, R deep
    fillet6_round = Plane((15.874797016, -2.8702, 0), x_dir=(-1, 0, 0), z_dir=(0, -1, 0)) * Cylinder(FILLET6_RADIUS, FILLET6_LENGTH, mode=Mode.PRIVATE)  # its axis R under the face
    add(fillet6_slab - fillet6_round, mode=Mode.SUBTRACT)


solid = part.part
